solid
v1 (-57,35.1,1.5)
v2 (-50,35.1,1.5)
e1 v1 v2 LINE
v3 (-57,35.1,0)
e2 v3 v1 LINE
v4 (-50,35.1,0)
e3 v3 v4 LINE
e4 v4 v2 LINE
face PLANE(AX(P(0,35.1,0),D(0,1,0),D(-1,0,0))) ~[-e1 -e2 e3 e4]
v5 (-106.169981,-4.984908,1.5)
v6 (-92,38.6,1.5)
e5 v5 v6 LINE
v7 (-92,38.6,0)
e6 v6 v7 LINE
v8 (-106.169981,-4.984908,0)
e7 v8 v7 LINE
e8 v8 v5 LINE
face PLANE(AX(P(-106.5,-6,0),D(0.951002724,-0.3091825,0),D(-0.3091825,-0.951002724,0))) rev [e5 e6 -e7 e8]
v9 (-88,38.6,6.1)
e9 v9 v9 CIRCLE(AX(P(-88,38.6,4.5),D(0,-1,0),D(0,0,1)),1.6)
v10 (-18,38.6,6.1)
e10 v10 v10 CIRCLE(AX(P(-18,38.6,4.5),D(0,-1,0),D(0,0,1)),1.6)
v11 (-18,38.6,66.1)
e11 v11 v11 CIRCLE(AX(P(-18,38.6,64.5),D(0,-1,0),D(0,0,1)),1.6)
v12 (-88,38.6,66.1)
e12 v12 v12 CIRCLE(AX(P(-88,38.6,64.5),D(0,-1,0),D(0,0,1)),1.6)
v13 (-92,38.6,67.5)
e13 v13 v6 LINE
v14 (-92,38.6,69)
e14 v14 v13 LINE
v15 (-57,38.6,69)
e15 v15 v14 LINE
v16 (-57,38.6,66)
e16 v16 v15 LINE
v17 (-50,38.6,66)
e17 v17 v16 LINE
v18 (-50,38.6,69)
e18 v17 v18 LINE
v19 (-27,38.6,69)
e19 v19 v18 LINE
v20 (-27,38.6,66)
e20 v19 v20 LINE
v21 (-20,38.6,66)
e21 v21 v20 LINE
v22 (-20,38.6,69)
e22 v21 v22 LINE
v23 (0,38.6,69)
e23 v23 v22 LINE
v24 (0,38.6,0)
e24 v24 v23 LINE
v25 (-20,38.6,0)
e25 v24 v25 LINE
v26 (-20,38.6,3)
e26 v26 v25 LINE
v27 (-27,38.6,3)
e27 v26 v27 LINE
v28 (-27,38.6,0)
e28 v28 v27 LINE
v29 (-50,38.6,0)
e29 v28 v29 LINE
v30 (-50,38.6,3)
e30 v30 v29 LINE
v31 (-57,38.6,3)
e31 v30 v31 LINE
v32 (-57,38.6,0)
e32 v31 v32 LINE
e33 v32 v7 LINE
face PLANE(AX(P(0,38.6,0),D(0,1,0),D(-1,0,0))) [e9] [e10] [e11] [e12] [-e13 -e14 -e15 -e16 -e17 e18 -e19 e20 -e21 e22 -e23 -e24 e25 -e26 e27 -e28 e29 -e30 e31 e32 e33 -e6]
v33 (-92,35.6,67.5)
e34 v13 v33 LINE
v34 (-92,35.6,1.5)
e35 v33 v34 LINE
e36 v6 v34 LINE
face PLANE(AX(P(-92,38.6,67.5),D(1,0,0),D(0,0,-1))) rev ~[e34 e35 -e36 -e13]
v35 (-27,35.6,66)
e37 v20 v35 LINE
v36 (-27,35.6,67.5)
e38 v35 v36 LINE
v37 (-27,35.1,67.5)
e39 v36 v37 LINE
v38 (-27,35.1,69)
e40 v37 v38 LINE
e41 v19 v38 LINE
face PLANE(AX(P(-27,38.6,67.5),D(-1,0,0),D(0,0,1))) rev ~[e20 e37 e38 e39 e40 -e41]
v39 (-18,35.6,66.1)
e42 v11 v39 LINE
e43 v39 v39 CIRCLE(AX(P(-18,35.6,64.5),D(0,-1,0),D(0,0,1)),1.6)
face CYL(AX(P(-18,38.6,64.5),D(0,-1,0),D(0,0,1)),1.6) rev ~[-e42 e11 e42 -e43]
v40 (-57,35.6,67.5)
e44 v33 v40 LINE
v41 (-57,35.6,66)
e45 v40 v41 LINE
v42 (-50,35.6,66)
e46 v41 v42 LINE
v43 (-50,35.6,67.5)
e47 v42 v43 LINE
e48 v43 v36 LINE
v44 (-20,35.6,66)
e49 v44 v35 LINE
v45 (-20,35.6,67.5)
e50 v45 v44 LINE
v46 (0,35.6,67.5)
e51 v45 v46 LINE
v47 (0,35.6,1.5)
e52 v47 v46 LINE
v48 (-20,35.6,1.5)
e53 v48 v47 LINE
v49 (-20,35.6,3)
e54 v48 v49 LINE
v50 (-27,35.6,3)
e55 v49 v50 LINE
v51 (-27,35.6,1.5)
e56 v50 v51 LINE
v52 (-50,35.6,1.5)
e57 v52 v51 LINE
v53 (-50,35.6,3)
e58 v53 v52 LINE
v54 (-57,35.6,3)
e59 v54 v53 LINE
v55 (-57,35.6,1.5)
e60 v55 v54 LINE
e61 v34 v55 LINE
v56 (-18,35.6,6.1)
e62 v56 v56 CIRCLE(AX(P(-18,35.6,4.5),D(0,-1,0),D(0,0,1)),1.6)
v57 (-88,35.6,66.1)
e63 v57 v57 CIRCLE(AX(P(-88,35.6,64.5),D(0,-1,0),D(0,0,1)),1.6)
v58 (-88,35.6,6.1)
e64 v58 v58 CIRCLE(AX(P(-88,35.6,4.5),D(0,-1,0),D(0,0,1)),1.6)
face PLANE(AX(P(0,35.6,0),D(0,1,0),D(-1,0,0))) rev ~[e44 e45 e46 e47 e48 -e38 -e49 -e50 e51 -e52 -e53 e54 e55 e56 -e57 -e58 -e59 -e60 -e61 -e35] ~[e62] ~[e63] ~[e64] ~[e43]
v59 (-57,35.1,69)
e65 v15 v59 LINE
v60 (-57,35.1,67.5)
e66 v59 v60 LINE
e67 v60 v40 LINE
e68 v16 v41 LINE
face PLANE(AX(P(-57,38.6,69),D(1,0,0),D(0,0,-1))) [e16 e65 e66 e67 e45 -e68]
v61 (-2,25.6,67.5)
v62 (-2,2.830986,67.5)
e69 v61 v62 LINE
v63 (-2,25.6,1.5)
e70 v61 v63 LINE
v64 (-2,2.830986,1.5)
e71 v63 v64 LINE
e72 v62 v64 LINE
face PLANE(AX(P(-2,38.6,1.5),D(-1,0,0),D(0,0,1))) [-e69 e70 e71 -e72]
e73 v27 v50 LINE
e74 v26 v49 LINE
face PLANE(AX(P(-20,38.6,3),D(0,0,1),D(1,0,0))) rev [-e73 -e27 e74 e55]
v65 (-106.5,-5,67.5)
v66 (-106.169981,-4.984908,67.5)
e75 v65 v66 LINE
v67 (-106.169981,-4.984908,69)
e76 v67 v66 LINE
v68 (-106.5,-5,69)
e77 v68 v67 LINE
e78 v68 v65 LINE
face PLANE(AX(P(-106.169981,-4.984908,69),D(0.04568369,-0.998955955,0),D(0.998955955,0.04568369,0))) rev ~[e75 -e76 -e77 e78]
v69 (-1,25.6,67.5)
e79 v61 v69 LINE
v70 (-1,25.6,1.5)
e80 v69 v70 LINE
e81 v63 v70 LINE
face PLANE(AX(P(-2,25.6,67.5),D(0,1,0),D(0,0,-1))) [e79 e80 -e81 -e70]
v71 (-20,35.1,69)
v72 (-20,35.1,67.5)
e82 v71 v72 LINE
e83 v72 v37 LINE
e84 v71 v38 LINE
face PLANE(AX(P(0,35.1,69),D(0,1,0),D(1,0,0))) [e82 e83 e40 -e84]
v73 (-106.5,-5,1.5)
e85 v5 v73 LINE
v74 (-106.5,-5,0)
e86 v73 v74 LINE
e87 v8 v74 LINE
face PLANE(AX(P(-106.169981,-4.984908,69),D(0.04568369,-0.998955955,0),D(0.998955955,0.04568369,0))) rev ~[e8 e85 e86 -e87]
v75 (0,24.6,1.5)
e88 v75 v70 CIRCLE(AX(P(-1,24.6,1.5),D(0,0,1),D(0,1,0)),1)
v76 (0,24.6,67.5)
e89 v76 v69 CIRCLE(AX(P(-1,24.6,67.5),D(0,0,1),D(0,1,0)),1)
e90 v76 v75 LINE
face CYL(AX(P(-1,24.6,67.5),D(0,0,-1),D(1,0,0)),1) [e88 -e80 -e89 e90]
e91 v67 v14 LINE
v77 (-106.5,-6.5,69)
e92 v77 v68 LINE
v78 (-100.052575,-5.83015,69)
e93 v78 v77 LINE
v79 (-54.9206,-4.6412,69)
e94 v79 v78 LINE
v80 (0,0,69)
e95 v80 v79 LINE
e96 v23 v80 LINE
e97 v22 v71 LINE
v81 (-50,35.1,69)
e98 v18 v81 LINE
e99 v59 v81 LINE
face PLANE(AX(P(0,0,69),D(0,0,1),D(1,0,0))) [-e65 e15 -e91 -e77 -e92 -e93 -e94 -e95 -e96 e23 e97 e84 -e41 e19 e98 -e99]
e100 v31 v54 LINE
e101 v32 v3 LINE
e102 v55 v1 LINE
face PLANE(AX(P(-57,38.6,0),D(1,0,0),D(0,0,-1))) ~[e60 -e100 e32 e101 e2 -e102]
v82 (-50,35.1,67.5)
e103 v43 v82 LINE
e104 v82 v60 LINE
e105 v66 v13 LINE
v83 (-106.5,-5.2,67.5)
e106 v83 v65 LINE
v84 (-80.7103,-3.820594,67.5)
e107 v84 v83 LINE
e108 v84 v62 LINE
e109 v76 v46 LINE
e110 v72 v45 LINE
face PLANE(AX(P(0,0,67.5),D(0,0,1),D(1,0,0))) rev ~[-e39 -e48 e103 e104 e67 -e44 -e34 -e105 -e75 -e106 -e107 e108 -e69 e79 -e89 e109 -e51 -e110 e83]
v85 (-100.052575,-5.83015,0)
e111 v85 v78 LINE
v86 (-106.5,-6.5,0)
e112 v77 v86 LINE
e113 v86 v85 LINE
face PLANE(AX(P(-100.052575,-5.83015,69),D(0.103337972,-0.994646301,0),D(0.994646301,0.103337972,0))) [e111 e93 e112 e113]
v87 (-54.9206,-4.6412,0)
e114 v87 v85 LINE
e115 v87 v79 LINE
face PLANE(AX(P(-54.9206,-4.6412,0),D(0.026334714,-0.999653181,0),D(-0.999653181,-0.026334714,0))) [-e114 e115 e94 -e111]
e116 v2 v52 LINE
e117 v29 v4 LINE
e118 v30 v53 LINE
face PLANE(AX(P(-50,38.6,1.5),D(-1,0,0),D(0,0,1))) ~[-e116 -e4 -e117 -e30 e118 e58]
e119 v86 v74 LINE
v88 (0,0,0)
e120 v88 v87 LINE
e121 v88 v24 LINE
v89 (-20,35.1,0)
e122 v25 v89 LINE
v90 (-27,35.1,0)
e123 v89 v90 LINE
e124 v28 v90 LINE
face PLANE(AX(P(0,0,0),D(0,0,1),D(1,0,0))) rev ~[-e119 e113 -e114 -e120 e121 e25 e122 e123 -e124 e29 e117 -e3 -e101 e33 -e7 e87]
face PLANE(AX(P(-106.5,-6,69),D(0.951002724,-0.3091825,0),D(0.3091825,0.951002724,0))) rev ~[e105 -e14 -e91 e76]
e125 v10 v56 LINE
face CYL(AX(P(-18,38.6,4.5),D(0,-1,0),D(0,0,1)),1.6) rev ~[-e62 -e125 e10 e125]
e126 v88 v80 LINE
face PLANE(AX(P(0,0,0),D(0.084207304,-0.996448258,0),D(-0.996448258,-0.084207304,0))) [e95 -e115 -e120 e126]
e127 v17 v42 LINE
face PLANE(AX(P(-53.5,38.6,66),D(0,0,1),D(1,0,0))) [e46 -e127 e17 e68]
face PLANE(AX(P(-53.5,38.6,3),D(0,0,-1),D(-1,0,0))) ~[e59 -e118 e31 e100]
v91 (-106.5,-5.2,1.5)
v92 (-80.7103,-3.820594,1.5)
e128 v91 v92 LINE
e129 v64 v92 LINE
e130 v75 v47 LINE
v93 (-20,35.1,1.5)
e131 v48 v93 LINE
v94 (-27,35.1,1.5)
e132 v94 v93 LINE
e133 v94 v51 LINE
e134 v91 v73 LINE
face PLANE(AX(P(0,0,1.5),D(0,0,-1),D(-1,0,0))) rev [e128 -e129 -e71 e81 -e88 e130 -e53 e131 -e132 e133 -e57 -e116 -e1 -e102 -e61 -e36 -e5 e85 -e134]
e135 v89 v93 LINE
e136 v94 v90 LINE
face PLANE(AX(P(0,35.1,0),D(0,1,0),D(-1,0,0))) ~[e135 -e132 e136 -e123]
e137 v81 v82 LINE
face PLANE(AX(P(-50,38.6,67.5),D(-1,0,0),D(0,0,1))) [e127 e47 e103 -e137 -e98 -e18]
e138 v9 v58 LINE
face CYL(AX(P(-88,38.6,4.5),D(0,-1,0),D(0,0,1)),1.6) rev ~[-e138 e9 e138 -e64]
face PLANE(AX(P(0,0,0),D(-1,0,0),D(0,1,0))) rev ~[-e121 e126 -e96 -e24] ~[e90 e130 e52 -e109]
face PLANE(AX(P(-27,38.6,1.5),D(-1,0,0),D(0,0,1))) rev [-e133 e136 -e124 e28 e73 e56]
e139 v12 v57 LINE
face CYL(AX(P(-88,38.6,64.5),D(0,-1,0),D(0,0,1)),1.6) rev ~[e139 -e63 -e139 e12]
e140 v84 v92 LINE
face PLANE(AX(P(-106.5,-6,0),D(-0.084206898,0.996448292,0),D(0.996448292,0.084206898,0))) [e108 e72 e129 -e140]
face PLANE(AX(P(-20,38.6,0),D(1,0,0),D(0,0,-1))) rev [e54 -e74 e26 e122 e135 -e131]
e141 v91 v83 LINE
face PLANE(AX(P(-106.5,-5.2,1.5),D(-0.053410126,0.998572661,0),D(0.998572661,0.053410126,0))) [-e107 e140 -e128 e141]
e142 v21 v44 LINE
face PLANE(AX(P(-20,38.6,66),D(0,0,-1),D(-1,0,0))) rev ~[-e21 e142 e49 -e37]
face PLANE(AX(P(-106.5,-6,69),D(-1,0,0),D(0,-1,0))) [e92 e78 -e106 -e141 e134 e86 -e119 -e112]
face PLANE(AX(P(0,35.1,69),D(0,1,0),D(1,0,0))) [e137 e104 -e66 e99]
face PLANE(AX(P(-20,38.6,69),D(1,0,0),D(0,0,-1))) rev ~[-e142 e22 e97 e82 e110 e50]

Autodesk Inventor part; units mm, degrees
sketch "草图1" plane through (0, 0, 0) normal (0, 0, 1) x (1, 0, 0)
  line L0 (0, 0) -> (0, 3)
  line L1 (0, 0) -> (0, -6) construction
  line L2 (0, -6) -> (-106.5, -6) construction
  line L3 (-106.5, -6) -> (0, 3)
  line L4 (0, 0) -> (-54.9206, -4.6412)
  line L5 (-54.9206, -4.6412) -> (-106.5, -6)
  dimension "d0" = 3
  dimension "d1" = 6
  dimension "d2" = 106.5
extrude "拉伸1" add sketch "草图1" along normal blind 69
ref_plane "工作平面1" through (0, 38.6, 0) normal (0, 1, 0) x (-1, 0, 0)
sketch "草图2" plane through (0, 38.6, 0) normal (0, 1, 0) x (-1, 0, 0)
  line L0 (0, 0) -> (106.5, 0) construction
  line L1 (106.5, 0) -> (106.5, 69) construction
  line L2 (0, 69) -> (106.5, 69) construction
  line L3 (0, 0) -> (0, 69) construction
  line L4 (0, 0) -> (92, 0)
  line L5 (92, 0) -> (92, 1.5)
  line L6 (92, 1.5) -> (2, 1.5)
  line L7 (2, 1.5) -> (2, 67.5)
  line L8 (2, 67.5) -> (92, 67.5)
  line L9 (92, 67.5) -> (92, 69)
  line L10 (0, 0) -> (0, 69) projected
  line L11 (0, 69) -> (92, 69)
  line L12 (0, 69) -> (106.5, 69) projected
  line L13 (0, 0) -> (0, 69)
  dimension "d6" = 1.5
  dimension "d7" = 1.5
  dimension "d8" = 66
  dimension "d9" = 2
  dimension "d10" = 90
extrude "拉伸2" add sketch "草图2" against normal up to surface from surface at 0 surface through (0, 3, 0) normal (-0.0842069, 0.9964483, 0)
sketch "草图3" plane through (0, 38.6, 0) normal (0, 1, 0) x (-1, 0, 0)
  line L0 (2, 1.5) -> (92, 1.5) construction
  line L1 (2, 67.5) -> (2, 1.5) construction
  line L2 (92, 67.5) -> (2, 67.5) construction
  line L3 (92, 1.5) -> (2, 1.5)
  line L4 (2, 1.5) -> (2, 67.5)
  line L5 (92, 67.5) -> (2, 67.5)
  line L6 (92, 67.5) -> (92, 1.5)
  point P0 (0, 0)
extrude "拉伸3" add sketch "草图3" against normal blind 3
sketch "草图4" plane through (-2, 2.831, 1.5) normal (-1, 0, 0) x (0, 0, 1)
  line L0 (66, 32.769) -> (0, 32.769) construction
  line L1 (0, 0) -> (0, 32.769) construction
  line L2 (66, 0) -> (0, 0) construction
  line L3 (66, 0) -> (66, 32.769) construction
  line L4 (66, -7.6056) -> (66, 32.769) projected
  line L5 (0, 32.769) -> (66, 32.769)
  line L6 (66, 32.769) -> (66, 22.769)
  line L7 (66, 22.769) -> (0, 22.769)
  line L8 (0, 22.769) -> (0, 32.769)
  point P0 (-1.5, -2.831)
  dimension "d15" = 10
extrude "拉伸4" cut sketch "草图4" against normal through all
sketch "草图5" plane through (0, 0, 69) normal (0, 0, 1) x (1, 0, 0)
  line L0 (-92, -4.7746) -> (-92, 38.6) construction
  line L1 (-92, -4.7746) -> (-106.5, -6) construction
  line L2 (-92, 38.6) -> (-92, -4.7746)
  line L3 (-106.5, -6) -> (-54.9206, -4.6412) projected
  line L4 (-92, -4.7746) -> (-92, 35.6) projected
  line L5 (-106.5, -6) -> (-92, -4.7746)
  line L6 (-92, -4.7746) -> (-92, 38.6) projected
  line L7 (-106.5, -6) -> (-92, 38.6)
  point P0 (0, 0)
extrude "拉伸5" add sketch "草图5" against normal blind 1.5
ref_plane "工作平面2" through (0, 0, 34.5) normal (0, 0, -1) x (-1, 0, 0)
mirror "镜像1" about plane through (0, 0, 34.5) normal (0, 0, -1) of "拉伸5"
sketch "草图7" plane through (0, 38.6, 69) normal (0, 1, 0) x (1, 0, 0)
  line L0 (-92, 69) -> (0, 69) projected
  line L1 (0, 69) -> (0, 0) construction
  line L2 (0, 34.5) -> (-92.7255, 34.5) construction
  line L3 (-92, 1.5) -> (-92, 67.5) projected
  point P0 (-18, 64.5)
  point P1 (-52, 64.5)
  point P2 (-88, 64.5)
  point P3 (-18, 4.5)
  point P4 (-52, 4.5)
  point P5 (-88, 4.5)
  point P6 (-92, 66.5)
  dimension "d22" = 4.5
  dimension "d23" = 4.5
  dimension "d24" = 4.5
  dimension "d25" = 34
  dimension "d26" = 36
  dimension "d27" = 60
  dimension "d35" = 4
hole "孔1" at (-88, 38.6, 64.5) at (-88, 38.6, 4.5) at (-18, 38.6, 4.5) at (-18, 38.6, 64.5) direction (0, -1, 0) diameter 3.2 depth 3
fillet "圆角1" radius 1 1 edges at (0, 25.6, 34.5)
sketch "草图9" plane through (0, 0, 69) normal (0, 0, 1) x (1, 0, 0)
  point P0 (0, 0)
sketch "草图10" plane through (0, 0, 69) normal (0, 0, 1) x (1, 0, 0)
  line L0 (-92, 38.6) -> (-106.5, -6) construction
  line L1 (-92, 35.6) -> (-92, 38.6) construction
  line L2 (-92, -4.7746) -> (-92, 35.6) construction
  line L3 (-92, -4.7746) -> (-106.5, -6) construction
  line L4 (-106.5, -6) -> (-54.9206, -4.6412) projected
  line L5 (-106.5, -6) -> (-106.5, -5)
  line L6 (-127.8168, 0) -> (21.4009, 0) projected
  line L7 (-106.5, -5) -> (-80.7103, -3.8206)
  line L8 (-2, 2.831) -> (-106.5, -6) projected
  line L9 (-106.5, -6) -> (-92, 38.6) projected
  line L10 (-106.5, -6) -> (-80.7103, -3.8206)
  line L11 (-106.5, -6) -> (-106.5, -6.5)
  line L12 (-106.5, -6.5) -> (-80.7103, -3.8206)
  line L13 (-106.5, -5.2) -> (-80.7103, -3.8206)
  point P0 (0, 0)
  dimension "d37" = 1
  dimension "d38" = 25.7897
  dimension "d42" = 0.5
  dimension "d55" = 0.2
extrude "拉伸7" add sketch "草图10" against normal up to surface (69 mm away) from surface at 0 contours L8 L12 L4 | L9 L13 L8 | L5 L13 L9 | L4 L12 L11 | L5 L7 L9 L13 | L13 L9 L7
sketch "草图11" plane through (-54.9206, -4.6412, 0) normal (0.0263351, -0.9996532, 0) x (0.9996532, 0.0263351, 0)
  point P0 (55.0238, 0)
ref_plane "工作平面3" through (0, -6, 0) normal (0, 1, 0) x (-1, 0, 0)
sketch "草图12" plane through (0, 38.6, 69) normal (0, 1, 0) x (1, 0, 0)
  line L0 (0, 0) -> (-92, 0) projected
  line L1 (-53.5, 0) -> (-53.5, 3)
  line L2 (-92, 1.5) -> (-92, 67.5) projected
  line L3 (-54.9206, 0) -> (0, 0) projected
  line L4 (-57, 3) -> (-50, 3)
  line L5 (-50, 3) -> (-50, 0)
  line L6 (-50, 0) -> (-57, 0)
  line L7 (-57, 0) -> (-57, 3)
  line L8 (-92, 1.5) -> (0, 1.5) projected
  line L9 (-57, 3) -> (-50, 0) construction
  line L10 (-50, 3) -> (-57, 0) construction
  line L11 (-20, 3) -> (-27, 3)
  line L12 (-27, 3) -> (-27, 0)
  line L13 (-27, 0) -> (-20, 0)
  line L14 (-20, 0) -> (-20, 3)
  line L15 (-20, 3) -> (-27, 0) construction
  line L16 (-27, 3) -> (-20, 0) construction
  point P0 (0, 69)
  point P1 (-53.5, 1.5)
  point P2 (-23.5, 1.5)
  dimension "d43" = 38.5
  dimension "d44" = 3
  dimension "d45" = 7
  dimension "d46" = 68.5
  dimension "d47" = 3
  dimension "d48" = 7
extrude "拉伸8" cut sketch "草图12" against normal blind 3.5 contours L0 L12 L8 L14 | L8 L12 L11 L14 | L0 L1 L8 L5 | L0 L7 L8 L1 | L8 L1 L4 L5 | L8 L7 L4 L1
ref_plane "工作平面4" through (0, 0, 34.5) normal (0, 0, 1) x (1, 0, 0)
mirror "镜像2" about plane through (0, 0, 34.5) normal (0, 0, 1) of "拉伸8"
extrude "拉伸9" cut sketch "草图10" along normal up to surface (66 mm away) from surface at -67.5 contours L5 L7 L9 L13 | L13 L9 L7
properties part number "仓库"
